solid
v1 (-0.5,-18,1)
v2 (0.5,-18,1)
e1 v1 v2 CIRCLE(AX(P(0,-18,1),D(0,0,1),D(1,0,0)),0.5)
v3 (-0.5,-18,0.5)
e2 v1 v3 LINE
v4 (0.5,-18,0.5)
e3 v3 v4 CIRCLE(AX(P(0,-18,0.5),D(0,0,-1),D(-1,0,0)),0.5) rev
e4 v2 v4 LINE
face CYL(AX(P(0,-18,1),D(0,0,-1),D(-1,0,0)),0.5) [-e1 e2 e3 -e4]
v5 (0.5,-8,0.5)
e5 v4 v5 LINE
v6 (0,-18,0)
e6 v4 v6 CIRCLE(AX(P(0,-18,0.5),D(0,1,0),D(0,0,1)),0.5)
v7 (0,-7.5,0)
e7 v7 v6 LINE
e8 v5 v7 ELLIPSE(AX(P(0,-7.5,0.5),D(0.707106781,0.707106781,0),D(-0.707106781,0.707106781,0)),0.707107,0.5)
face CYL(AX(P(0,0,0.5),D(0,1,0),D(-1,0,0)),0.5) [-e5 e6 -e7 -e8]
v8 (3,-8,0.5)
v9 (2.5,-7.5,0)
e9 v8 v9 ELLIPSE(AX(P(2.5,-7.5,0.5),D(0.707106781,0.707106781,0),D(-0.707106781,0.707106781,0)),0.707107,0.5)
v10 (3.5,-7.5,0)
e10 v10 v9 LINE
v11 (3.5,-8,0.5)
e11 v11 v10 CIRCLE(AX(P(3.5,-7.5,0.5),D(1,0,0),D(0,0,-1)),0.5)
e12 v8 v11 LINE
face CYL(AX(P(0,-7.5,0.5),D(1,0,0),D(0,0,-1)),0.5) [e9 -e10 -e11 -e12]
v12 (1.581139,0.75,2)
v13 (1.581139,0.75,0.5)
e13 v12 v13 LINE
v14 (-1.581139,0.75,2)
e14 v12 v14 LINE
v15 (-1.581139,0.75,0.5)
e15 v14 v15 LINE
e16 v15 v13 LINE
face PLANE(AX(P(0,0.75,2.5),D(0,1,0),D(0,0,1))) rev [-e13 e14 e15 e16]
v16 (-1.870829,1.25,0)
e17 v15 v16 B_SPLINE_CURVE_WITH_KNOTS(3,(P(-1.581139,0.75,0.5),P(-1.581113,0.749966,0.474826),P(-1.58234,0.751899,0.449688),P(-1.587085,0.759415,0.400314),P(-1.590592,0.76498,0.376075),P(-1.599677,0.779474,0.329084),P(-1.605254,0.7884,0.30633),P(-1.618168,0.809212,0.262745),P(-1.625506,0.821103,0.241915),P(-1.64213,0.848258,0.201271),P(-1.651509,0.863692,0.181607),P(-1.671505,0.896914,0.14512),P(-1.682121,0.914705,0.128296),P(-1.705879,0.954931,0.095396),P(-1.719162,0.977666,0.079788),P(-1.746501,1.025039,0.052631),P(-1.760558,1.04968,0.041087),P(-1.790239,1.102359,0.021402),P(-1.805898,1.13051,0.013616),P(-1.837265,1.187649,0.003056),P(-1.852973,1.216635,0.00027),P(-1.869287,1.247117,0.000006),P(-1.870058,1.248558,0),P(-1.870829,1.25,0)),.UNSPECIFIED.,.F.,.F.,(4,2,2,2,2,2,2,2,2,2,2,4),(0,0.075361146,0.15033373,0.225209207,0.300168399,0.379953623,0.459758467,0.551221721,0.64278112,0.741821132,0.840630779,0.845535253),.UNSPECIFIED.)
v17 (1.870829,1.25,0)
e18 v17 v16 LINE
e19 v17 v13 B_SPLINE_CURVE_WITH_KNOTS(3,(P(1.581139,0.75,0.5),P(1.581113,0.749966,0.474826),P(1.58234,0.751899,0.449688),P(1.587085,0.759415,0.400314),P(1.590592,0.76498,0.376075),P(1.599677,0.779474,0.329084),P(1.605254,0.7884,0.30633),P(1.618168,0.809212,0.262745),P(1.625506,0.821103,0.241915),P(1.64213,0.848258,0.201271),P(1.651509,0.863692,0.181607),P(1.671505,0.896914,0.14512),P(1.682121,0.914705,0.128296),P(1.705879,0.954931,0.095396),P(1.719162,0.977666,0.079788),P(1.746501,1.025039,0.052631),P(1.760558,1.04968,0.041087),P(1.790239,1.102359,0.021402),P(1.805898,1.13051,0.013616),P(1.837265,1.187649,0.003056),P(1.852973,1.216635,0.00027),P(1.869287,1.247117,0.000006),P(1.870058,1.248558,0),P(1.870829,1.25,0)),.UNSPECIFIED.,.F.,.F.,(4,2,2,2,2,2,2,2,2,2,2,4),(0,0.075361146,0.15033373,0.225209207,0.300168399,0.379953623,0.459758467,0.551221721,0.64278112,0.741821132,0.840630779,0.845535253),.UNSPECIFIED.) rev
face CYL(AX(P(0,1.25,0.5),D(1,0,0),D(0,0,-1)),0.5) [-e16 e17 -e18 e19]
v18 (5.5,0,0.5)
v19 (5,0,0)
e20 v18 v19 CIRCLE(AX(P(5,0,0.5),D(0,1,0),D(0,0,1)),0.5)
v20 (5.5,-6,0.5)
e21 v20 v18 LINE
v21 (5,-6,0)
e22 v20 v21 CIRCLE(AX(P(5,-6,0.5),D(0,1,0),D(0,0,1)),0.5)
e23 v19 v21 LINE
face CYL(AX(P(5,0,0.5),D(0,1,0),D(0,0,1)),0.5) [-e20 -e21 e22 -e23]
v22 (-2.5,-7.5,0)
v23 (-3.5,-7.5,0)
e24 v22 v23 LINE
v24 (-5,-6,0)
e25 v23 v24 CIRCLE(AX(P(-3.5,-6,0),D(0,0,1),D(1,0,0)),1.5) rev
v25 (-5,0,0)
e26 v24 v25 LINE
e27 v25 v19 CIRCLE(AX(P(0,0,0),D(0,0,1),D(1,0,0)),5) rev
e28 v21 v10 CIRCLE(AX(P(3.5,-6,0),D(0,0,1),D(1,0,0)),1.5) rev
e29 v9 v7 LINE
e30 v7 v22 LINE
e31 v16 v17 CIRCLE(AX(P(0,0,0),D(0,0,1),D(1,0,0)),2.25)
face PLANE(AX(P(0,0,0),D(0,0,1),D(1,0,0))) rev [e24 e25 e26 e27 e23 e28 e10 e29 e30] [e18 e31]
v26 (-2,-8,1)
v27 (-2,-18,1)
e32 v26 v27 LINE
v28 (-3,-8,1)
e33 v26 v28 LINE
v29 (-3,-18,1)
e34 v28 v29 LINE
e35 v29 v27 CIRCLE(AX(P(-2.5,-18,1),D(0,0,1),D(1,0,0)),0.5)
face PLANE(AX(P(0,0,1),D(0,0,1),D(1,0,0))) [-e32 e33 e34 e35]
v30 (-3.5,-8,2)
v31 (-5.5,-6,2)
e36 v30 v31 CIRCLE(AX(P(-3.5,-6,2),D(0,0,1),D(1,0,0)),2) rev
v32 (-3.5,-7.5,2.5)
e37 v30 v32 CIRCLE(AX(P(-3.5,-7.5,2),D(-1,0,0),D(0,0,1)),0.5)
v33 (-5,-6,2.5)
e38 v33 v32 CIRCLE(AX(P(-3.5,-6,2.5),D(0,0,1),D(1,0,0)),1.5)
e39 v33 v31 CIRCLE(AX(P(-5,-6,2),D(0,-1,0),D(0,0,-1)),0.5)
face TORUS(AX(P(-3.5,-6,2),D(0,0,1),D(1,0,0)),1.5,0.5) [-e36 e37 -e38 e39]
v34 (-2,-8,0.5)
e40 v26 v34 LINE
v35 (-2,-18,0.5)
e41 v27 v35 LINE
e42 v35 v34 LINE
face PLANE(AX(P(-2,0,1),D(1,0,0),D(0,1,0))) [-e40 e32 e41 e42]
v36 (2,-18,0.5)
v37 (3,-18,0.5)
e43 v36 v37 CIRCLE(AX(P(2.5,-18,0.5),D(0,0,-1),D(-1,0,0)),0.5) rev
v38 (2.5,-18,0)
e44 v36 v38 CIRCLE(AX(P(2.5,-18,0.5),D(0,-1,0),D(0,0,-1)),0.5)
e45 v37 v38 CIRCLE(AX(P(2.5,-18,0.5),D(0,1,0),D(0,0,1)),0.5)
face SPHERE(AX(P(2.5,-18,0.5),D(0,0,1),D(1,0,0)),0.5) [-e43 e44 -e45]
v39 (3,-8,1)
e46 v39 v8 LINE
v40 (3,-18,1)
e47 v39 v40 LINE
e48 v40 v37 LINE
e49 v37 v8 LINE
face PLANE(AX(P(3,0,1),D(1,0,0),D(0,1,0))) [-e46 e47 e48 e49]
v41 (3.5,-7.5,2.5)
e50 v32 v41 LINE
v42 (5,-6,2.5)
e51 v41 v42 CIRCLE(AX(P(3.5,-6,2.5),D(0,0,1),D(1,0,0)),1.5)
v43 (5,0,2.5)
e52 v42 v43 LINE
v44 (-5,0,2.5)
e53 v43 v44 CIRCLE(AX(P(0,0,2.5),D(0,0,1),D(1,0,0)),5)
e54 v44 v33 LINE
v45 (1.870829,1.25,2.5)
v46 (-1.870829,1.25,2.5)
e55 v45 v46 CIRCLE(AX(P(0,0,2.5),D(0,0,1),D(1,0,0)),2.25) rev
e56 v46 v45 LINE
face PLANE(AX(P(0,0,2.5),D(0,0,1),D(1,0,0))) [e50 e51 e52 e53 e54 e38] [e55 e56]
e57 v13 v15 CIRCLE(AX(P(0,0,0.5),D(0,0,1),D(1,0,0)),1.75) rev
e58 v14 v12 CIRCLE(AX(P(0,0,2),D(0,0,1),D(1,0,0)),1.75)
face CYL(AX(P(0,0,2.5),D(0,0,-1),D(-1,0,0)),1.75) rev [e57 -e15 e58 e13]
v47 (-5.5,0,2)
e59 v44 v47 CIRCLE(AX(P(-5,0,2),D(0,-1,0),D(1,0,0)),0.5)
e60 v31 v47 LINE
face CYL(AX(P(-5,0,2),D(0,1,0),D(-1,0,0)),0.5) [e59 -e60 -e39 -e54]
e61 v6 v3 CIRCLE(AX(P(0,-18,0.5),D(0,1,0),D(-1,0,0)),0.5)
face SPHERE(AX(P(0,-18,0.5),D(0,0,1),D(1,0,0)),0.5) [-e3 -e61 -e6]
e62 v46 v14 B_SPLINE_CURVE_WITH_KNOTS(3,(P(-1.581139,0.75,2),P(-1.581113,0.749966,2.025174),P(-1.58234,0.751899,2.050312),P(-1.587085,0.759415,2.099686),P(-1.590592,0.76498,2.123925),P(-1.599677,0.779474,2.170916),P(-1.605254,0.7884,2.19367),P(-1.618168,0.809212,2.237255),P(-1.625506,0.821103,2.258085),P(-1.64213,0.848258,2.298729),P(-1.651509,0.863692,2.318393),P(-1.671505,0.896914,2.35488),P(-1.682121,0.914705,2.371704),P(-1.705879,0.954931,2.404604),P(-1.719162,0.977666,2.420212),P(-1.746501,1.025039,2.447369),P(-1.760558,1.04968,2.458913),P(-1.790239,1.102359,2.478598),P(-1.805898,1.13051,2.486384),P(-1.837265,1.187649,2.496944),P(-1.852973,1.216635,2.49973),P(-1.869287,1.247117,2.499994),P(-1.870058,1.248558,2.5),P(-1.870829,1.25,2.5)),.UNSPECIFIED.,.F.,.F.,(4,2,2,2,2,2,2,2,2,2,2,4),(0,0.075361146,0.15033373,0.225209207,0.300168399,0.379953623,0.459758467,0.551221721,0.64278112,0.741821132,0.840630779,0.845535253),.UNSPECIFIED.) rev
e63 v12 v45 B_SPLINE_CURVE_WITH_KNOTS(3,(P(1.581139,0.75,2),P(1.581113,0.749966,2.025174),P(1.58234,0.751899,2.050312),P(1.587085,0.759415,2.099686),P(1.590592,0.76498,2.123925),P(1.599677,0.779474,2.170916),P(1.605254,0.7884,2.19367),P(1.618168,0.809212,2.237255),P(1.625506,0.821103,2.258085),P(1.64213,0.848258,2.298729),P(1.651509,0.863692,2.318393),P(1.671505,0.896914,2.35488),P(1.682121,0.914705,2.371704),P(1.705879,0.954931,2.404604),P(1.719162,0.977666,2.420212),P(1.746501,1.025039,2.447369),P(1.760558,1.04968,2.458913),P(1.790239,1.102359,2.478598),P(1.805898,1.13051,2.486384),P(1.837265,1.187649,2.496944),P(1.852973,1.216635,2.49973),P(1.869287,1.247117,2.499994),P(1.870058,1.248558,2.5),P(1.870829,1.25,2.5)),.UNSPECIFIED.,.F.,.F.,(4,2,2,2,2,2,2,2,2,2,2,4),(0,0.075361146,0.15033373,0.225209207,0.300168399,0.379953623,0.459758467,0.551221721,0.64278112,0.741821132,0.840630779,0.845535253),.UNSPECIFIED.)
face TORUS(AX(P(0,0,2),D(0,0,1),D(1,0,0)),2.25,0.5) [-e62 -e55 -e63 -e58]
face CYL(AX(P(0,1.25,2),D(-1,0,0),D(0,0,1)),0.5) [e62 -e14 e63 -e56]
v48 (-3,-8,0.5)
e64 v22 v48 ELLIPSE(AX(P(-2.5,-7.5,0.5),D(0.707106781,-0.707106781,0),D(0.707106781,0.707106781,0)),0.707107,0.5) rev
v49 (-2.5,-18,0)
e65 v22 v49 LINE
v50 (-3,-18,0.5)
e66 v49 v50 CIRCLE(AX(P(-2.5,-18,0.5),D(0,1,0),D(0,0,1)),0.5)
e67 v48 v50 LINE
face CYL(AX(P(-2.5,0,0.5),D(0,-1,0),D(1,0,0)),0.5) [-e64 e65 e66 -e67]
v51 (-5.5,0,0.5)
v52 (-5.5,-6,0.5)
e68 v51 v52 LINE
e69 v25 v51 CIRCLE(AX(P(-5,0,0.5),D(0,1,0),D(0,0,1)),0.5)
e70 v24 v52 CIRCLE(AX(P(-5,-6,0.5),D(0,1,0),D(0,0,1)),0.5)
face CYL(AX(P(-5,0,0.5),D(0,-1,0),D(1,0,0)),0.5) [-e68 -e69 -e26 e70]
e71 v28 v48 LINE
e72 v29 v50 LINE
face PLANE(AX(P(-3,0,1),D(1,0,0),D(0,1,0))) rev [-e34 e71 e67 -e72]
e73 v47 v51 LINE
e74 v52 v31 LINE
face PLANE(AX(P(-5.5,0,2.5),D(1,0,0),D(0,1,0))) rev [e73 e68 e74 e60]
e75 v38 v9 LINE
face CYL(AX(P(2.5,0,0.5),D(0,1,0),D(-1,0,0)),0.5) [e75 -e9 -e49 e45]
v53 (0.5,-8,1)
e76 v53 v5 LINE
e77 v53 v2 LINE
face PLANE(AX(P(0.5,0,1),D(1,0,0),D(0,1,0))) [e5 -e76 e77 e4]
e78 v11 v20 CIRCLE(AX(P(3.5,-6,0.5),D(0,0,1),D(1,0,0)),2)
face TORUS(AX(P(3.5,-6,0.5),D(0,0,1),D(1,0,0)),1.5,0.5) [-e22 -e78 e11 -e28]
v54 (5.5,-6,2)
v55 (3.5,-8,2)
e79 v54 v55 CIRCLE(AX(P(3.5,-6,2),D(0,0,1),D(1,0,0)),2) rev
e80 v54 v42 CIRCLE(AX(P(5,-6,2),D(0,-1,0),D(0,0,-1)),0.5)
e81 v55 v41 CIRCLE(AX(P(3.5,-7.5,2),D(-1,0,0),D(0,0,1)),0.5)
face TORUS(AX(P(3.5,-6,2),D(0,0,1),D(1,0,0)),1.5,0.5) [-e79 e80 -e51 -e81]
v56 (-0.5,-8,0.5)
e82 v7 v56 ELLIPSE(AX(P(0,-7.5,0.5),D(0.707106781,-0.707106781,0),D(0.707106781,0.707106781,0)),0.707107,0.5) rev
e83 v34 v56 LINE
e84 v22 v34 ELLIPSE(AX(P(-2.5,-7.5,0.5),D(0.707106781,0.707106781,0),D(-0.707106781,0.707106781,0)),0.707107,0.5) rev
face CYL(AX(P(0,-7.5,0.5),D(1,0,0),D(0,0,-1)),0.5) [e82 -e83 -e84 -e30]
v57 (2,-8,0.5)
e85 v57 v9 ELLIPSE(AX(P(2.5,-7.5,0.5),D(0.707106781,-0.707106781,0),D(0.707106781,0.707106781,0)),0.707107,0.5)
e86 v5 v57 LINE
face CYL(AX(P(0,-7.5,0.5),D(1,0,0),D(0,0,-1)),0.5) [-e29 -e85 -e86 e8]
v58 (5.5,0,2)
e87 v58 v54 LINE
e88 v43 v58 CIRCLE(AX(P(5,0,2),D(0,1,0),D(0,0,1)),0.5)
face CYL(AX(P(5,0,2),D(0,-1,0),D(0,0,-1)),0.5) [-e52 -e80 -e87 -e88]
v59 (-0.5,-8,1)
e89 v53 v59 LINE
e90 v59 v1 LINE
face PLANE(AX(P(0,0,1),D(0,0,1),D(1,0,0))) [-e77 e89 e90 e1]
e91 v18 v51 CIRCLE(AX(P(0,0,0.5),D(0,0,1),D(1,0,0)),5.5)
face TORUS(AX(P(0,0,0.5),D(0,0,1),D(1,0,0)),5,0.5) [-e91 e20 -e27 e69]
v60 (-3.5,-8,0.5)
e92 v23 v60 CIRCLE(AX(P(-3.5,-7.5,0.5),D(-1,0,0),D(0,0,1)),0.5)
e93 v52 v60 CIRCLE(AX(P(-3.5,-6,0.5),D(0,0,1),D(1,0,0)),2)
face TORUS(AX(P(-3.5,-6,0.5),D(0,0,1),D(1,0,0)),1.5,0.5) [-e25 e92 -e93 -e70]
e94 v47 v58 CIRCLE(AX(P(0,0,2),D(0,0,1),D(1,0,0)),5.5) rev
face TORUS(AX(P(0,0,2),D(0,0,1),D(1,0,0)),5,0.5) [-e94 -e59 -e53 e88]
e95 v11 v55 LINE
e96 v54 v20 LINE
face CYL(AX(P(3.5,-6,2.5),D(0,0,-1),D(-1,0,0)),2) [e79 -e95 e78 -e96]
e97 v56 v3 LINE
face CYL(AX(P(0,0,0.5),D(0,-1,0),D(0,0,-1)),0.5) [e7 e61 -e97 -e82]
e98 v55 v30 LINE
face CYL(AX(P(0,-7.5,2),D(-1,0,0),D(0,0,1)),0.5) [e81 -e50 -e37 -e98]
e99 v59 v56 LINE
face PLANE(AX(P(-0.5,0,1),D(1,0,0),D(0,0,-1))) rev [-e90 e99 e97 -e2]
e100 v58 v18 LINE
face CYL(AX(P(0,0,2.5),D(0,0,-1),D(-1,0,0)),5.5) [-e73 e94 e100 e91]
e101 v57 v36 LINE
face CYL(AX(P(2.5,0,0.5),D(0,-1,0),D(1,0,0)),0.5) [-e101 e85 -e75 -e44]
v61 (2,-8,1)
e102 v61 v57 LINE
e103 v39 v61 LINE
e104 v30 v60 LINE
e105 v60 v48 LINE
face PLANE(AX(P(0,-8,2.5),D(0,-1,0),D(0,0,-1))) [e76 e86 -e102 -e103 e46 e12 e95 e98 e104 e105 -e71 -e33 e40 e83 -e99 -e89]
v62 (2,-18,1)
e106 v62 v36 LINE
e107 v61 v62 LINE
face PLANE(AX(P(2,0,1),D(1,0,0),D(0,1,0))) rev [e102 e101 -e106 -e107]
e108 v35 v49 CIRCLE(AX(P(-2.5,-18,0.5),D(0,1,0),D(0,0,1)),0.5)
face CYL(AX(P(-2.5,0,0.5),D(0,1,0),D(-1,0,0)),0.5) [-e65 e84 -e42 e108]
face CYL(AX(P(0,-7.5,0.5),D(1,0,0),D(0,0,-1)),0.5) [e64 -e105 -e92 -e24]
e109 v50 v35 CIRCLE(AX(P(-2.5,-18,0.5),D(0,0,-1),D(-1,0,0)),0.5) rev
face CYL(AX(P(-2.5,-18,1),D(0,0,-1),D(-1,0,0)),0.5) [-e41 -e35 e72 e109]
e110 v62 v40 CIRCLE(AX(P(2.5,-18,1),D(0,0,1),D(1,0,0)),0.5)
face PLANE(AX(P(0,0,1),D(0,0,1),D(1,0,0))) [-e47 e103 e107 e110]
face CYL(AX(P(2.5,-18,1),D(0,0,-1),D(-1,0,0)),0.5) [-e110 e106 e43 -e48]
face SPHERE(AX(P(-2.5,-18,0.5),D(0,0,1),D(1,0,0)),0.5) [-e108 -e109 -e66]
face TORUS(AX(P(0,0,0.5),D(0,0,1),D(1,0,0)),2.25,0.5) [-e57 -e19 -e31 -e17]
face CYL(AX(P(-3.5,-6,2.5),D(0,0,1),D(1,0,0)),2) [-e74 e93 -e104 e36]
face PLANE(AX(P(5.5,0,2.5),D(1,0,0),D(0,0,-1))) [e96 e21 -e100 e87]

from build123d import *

# Parameters (mm, degrees)
BOSS_EXTRUDE1_DEPTH = 2.5
BOSS_EXTRUDE2_DEPTH = 1
FILLET1_R           = 2
FILLET2_R           = 0.5


with BuildPart() as part:
    # Sketch1 → Boss-Extrude1 (new body)
    with BuildSketch(Plane.XY):
        with BuildLine():
            Line((5.5, 0), (5.5, -8))
            Line((5.5, -8), (-5.5, -8))
            Line((-5.5, -8), (-5.5, 0))
            ThreePointArc((-5.5, 0), (0, 5.5), (5.5, 0))
        make_face()
        with BuildLine():
            ThreePointArc((-1.58113883, 0.75), (0, -1.75), (1.58113883, 0.75))
            Line((1.58113883, 0.75), (-1.58113883, 0.75))
        make_face(mode=Mode.SUBTRACT)
    extrude(amount=BOSS_EXTRUDE1_DEPTH)

    # Sketch1<3> → Boss-Extrude2 (add)
    with BuildSketch(Plane.XY):
        with BuildLine():
            Line((-2, -8), (-3, -8))
            Line((-3, -8), (-3, -18))
            ThreePointArc((-3, -18), (-2.5, -18.5), (-2, -18))
            Line((-2, -18), (-2, -8))
        make_face()
        with BuildLine():
            Line((0.5, -8), (-0.5, -8))
            Line((-0.5, -8), (-0.5, -18))
            ThreePointArc((-0.5, -18), (0, -18.5), (0.5, -18))
            Line((0.5, -18), (0.5, -8))
        make_face()
        with BuildLine():
            Line((3, -18), (3, -8))
            Line((3, -8), (2, -8))
            Line((2, -8), (2, -18))
            ThreePointArc((2, -18), (2.5, -18.5), (3, -18))
        make_face()
    extrude(amount=BOSS_EXTRUDE2_DEPTH)

    # Fillet1
    fillet1_edges = [part.edges().sort_by_distance(p)[0] for p in [
        (5.5, -8, 1.25),
        (-5.5, -8, 1.25),
    ]]
    fillet(fillet1_edges, radius=FILLET1_R)

    # Fillet2
    fillet2_edges = [part.edges().sort_by_distance(p)[0] for p in [
        (0, 0.75, 2.5),
        (0, -1.75, 0),
        (5.5, -3, 2.5),
        (0, 5.5, 2.5),
        (-3.25, -8, 0),
        (-3, -13, 0),
        (-5.5, -3, 2.5),
        (-2.5, -18.5, 0),
        (-2, -13, 0),
        (-1.25, -8, 0),
        (-0.5, -13, 0),
        (0, -18.5, 0),
        (0.5, -13, 0),
        (1.25, -8, 0),
        (2, -13, 0),
        (2.5, -18.5, 0),
        (3, -13, 0),
        (3.25, -8, 0),
        (-4.914213562, -7.414213562, 0),
        (4.914213562, -7.414213562, 0),
        (0, -8, 2.5),
        (0, -1.75, 2.5),
        (-4.914213562, -7.414213562, 2.5),
        (4.914213562, -7.414213562, 2.5),
        (-5.5, -3, 0),
        (0, 5.5, 0),
        (5.5, -3, 0),
        (0, 0.75, 0),
    ]]
    fillet(fillet2_edges, radius=FILLET2_R - 0.0001)  # a hair under: the kernel refuses the full size


solid = part.part
